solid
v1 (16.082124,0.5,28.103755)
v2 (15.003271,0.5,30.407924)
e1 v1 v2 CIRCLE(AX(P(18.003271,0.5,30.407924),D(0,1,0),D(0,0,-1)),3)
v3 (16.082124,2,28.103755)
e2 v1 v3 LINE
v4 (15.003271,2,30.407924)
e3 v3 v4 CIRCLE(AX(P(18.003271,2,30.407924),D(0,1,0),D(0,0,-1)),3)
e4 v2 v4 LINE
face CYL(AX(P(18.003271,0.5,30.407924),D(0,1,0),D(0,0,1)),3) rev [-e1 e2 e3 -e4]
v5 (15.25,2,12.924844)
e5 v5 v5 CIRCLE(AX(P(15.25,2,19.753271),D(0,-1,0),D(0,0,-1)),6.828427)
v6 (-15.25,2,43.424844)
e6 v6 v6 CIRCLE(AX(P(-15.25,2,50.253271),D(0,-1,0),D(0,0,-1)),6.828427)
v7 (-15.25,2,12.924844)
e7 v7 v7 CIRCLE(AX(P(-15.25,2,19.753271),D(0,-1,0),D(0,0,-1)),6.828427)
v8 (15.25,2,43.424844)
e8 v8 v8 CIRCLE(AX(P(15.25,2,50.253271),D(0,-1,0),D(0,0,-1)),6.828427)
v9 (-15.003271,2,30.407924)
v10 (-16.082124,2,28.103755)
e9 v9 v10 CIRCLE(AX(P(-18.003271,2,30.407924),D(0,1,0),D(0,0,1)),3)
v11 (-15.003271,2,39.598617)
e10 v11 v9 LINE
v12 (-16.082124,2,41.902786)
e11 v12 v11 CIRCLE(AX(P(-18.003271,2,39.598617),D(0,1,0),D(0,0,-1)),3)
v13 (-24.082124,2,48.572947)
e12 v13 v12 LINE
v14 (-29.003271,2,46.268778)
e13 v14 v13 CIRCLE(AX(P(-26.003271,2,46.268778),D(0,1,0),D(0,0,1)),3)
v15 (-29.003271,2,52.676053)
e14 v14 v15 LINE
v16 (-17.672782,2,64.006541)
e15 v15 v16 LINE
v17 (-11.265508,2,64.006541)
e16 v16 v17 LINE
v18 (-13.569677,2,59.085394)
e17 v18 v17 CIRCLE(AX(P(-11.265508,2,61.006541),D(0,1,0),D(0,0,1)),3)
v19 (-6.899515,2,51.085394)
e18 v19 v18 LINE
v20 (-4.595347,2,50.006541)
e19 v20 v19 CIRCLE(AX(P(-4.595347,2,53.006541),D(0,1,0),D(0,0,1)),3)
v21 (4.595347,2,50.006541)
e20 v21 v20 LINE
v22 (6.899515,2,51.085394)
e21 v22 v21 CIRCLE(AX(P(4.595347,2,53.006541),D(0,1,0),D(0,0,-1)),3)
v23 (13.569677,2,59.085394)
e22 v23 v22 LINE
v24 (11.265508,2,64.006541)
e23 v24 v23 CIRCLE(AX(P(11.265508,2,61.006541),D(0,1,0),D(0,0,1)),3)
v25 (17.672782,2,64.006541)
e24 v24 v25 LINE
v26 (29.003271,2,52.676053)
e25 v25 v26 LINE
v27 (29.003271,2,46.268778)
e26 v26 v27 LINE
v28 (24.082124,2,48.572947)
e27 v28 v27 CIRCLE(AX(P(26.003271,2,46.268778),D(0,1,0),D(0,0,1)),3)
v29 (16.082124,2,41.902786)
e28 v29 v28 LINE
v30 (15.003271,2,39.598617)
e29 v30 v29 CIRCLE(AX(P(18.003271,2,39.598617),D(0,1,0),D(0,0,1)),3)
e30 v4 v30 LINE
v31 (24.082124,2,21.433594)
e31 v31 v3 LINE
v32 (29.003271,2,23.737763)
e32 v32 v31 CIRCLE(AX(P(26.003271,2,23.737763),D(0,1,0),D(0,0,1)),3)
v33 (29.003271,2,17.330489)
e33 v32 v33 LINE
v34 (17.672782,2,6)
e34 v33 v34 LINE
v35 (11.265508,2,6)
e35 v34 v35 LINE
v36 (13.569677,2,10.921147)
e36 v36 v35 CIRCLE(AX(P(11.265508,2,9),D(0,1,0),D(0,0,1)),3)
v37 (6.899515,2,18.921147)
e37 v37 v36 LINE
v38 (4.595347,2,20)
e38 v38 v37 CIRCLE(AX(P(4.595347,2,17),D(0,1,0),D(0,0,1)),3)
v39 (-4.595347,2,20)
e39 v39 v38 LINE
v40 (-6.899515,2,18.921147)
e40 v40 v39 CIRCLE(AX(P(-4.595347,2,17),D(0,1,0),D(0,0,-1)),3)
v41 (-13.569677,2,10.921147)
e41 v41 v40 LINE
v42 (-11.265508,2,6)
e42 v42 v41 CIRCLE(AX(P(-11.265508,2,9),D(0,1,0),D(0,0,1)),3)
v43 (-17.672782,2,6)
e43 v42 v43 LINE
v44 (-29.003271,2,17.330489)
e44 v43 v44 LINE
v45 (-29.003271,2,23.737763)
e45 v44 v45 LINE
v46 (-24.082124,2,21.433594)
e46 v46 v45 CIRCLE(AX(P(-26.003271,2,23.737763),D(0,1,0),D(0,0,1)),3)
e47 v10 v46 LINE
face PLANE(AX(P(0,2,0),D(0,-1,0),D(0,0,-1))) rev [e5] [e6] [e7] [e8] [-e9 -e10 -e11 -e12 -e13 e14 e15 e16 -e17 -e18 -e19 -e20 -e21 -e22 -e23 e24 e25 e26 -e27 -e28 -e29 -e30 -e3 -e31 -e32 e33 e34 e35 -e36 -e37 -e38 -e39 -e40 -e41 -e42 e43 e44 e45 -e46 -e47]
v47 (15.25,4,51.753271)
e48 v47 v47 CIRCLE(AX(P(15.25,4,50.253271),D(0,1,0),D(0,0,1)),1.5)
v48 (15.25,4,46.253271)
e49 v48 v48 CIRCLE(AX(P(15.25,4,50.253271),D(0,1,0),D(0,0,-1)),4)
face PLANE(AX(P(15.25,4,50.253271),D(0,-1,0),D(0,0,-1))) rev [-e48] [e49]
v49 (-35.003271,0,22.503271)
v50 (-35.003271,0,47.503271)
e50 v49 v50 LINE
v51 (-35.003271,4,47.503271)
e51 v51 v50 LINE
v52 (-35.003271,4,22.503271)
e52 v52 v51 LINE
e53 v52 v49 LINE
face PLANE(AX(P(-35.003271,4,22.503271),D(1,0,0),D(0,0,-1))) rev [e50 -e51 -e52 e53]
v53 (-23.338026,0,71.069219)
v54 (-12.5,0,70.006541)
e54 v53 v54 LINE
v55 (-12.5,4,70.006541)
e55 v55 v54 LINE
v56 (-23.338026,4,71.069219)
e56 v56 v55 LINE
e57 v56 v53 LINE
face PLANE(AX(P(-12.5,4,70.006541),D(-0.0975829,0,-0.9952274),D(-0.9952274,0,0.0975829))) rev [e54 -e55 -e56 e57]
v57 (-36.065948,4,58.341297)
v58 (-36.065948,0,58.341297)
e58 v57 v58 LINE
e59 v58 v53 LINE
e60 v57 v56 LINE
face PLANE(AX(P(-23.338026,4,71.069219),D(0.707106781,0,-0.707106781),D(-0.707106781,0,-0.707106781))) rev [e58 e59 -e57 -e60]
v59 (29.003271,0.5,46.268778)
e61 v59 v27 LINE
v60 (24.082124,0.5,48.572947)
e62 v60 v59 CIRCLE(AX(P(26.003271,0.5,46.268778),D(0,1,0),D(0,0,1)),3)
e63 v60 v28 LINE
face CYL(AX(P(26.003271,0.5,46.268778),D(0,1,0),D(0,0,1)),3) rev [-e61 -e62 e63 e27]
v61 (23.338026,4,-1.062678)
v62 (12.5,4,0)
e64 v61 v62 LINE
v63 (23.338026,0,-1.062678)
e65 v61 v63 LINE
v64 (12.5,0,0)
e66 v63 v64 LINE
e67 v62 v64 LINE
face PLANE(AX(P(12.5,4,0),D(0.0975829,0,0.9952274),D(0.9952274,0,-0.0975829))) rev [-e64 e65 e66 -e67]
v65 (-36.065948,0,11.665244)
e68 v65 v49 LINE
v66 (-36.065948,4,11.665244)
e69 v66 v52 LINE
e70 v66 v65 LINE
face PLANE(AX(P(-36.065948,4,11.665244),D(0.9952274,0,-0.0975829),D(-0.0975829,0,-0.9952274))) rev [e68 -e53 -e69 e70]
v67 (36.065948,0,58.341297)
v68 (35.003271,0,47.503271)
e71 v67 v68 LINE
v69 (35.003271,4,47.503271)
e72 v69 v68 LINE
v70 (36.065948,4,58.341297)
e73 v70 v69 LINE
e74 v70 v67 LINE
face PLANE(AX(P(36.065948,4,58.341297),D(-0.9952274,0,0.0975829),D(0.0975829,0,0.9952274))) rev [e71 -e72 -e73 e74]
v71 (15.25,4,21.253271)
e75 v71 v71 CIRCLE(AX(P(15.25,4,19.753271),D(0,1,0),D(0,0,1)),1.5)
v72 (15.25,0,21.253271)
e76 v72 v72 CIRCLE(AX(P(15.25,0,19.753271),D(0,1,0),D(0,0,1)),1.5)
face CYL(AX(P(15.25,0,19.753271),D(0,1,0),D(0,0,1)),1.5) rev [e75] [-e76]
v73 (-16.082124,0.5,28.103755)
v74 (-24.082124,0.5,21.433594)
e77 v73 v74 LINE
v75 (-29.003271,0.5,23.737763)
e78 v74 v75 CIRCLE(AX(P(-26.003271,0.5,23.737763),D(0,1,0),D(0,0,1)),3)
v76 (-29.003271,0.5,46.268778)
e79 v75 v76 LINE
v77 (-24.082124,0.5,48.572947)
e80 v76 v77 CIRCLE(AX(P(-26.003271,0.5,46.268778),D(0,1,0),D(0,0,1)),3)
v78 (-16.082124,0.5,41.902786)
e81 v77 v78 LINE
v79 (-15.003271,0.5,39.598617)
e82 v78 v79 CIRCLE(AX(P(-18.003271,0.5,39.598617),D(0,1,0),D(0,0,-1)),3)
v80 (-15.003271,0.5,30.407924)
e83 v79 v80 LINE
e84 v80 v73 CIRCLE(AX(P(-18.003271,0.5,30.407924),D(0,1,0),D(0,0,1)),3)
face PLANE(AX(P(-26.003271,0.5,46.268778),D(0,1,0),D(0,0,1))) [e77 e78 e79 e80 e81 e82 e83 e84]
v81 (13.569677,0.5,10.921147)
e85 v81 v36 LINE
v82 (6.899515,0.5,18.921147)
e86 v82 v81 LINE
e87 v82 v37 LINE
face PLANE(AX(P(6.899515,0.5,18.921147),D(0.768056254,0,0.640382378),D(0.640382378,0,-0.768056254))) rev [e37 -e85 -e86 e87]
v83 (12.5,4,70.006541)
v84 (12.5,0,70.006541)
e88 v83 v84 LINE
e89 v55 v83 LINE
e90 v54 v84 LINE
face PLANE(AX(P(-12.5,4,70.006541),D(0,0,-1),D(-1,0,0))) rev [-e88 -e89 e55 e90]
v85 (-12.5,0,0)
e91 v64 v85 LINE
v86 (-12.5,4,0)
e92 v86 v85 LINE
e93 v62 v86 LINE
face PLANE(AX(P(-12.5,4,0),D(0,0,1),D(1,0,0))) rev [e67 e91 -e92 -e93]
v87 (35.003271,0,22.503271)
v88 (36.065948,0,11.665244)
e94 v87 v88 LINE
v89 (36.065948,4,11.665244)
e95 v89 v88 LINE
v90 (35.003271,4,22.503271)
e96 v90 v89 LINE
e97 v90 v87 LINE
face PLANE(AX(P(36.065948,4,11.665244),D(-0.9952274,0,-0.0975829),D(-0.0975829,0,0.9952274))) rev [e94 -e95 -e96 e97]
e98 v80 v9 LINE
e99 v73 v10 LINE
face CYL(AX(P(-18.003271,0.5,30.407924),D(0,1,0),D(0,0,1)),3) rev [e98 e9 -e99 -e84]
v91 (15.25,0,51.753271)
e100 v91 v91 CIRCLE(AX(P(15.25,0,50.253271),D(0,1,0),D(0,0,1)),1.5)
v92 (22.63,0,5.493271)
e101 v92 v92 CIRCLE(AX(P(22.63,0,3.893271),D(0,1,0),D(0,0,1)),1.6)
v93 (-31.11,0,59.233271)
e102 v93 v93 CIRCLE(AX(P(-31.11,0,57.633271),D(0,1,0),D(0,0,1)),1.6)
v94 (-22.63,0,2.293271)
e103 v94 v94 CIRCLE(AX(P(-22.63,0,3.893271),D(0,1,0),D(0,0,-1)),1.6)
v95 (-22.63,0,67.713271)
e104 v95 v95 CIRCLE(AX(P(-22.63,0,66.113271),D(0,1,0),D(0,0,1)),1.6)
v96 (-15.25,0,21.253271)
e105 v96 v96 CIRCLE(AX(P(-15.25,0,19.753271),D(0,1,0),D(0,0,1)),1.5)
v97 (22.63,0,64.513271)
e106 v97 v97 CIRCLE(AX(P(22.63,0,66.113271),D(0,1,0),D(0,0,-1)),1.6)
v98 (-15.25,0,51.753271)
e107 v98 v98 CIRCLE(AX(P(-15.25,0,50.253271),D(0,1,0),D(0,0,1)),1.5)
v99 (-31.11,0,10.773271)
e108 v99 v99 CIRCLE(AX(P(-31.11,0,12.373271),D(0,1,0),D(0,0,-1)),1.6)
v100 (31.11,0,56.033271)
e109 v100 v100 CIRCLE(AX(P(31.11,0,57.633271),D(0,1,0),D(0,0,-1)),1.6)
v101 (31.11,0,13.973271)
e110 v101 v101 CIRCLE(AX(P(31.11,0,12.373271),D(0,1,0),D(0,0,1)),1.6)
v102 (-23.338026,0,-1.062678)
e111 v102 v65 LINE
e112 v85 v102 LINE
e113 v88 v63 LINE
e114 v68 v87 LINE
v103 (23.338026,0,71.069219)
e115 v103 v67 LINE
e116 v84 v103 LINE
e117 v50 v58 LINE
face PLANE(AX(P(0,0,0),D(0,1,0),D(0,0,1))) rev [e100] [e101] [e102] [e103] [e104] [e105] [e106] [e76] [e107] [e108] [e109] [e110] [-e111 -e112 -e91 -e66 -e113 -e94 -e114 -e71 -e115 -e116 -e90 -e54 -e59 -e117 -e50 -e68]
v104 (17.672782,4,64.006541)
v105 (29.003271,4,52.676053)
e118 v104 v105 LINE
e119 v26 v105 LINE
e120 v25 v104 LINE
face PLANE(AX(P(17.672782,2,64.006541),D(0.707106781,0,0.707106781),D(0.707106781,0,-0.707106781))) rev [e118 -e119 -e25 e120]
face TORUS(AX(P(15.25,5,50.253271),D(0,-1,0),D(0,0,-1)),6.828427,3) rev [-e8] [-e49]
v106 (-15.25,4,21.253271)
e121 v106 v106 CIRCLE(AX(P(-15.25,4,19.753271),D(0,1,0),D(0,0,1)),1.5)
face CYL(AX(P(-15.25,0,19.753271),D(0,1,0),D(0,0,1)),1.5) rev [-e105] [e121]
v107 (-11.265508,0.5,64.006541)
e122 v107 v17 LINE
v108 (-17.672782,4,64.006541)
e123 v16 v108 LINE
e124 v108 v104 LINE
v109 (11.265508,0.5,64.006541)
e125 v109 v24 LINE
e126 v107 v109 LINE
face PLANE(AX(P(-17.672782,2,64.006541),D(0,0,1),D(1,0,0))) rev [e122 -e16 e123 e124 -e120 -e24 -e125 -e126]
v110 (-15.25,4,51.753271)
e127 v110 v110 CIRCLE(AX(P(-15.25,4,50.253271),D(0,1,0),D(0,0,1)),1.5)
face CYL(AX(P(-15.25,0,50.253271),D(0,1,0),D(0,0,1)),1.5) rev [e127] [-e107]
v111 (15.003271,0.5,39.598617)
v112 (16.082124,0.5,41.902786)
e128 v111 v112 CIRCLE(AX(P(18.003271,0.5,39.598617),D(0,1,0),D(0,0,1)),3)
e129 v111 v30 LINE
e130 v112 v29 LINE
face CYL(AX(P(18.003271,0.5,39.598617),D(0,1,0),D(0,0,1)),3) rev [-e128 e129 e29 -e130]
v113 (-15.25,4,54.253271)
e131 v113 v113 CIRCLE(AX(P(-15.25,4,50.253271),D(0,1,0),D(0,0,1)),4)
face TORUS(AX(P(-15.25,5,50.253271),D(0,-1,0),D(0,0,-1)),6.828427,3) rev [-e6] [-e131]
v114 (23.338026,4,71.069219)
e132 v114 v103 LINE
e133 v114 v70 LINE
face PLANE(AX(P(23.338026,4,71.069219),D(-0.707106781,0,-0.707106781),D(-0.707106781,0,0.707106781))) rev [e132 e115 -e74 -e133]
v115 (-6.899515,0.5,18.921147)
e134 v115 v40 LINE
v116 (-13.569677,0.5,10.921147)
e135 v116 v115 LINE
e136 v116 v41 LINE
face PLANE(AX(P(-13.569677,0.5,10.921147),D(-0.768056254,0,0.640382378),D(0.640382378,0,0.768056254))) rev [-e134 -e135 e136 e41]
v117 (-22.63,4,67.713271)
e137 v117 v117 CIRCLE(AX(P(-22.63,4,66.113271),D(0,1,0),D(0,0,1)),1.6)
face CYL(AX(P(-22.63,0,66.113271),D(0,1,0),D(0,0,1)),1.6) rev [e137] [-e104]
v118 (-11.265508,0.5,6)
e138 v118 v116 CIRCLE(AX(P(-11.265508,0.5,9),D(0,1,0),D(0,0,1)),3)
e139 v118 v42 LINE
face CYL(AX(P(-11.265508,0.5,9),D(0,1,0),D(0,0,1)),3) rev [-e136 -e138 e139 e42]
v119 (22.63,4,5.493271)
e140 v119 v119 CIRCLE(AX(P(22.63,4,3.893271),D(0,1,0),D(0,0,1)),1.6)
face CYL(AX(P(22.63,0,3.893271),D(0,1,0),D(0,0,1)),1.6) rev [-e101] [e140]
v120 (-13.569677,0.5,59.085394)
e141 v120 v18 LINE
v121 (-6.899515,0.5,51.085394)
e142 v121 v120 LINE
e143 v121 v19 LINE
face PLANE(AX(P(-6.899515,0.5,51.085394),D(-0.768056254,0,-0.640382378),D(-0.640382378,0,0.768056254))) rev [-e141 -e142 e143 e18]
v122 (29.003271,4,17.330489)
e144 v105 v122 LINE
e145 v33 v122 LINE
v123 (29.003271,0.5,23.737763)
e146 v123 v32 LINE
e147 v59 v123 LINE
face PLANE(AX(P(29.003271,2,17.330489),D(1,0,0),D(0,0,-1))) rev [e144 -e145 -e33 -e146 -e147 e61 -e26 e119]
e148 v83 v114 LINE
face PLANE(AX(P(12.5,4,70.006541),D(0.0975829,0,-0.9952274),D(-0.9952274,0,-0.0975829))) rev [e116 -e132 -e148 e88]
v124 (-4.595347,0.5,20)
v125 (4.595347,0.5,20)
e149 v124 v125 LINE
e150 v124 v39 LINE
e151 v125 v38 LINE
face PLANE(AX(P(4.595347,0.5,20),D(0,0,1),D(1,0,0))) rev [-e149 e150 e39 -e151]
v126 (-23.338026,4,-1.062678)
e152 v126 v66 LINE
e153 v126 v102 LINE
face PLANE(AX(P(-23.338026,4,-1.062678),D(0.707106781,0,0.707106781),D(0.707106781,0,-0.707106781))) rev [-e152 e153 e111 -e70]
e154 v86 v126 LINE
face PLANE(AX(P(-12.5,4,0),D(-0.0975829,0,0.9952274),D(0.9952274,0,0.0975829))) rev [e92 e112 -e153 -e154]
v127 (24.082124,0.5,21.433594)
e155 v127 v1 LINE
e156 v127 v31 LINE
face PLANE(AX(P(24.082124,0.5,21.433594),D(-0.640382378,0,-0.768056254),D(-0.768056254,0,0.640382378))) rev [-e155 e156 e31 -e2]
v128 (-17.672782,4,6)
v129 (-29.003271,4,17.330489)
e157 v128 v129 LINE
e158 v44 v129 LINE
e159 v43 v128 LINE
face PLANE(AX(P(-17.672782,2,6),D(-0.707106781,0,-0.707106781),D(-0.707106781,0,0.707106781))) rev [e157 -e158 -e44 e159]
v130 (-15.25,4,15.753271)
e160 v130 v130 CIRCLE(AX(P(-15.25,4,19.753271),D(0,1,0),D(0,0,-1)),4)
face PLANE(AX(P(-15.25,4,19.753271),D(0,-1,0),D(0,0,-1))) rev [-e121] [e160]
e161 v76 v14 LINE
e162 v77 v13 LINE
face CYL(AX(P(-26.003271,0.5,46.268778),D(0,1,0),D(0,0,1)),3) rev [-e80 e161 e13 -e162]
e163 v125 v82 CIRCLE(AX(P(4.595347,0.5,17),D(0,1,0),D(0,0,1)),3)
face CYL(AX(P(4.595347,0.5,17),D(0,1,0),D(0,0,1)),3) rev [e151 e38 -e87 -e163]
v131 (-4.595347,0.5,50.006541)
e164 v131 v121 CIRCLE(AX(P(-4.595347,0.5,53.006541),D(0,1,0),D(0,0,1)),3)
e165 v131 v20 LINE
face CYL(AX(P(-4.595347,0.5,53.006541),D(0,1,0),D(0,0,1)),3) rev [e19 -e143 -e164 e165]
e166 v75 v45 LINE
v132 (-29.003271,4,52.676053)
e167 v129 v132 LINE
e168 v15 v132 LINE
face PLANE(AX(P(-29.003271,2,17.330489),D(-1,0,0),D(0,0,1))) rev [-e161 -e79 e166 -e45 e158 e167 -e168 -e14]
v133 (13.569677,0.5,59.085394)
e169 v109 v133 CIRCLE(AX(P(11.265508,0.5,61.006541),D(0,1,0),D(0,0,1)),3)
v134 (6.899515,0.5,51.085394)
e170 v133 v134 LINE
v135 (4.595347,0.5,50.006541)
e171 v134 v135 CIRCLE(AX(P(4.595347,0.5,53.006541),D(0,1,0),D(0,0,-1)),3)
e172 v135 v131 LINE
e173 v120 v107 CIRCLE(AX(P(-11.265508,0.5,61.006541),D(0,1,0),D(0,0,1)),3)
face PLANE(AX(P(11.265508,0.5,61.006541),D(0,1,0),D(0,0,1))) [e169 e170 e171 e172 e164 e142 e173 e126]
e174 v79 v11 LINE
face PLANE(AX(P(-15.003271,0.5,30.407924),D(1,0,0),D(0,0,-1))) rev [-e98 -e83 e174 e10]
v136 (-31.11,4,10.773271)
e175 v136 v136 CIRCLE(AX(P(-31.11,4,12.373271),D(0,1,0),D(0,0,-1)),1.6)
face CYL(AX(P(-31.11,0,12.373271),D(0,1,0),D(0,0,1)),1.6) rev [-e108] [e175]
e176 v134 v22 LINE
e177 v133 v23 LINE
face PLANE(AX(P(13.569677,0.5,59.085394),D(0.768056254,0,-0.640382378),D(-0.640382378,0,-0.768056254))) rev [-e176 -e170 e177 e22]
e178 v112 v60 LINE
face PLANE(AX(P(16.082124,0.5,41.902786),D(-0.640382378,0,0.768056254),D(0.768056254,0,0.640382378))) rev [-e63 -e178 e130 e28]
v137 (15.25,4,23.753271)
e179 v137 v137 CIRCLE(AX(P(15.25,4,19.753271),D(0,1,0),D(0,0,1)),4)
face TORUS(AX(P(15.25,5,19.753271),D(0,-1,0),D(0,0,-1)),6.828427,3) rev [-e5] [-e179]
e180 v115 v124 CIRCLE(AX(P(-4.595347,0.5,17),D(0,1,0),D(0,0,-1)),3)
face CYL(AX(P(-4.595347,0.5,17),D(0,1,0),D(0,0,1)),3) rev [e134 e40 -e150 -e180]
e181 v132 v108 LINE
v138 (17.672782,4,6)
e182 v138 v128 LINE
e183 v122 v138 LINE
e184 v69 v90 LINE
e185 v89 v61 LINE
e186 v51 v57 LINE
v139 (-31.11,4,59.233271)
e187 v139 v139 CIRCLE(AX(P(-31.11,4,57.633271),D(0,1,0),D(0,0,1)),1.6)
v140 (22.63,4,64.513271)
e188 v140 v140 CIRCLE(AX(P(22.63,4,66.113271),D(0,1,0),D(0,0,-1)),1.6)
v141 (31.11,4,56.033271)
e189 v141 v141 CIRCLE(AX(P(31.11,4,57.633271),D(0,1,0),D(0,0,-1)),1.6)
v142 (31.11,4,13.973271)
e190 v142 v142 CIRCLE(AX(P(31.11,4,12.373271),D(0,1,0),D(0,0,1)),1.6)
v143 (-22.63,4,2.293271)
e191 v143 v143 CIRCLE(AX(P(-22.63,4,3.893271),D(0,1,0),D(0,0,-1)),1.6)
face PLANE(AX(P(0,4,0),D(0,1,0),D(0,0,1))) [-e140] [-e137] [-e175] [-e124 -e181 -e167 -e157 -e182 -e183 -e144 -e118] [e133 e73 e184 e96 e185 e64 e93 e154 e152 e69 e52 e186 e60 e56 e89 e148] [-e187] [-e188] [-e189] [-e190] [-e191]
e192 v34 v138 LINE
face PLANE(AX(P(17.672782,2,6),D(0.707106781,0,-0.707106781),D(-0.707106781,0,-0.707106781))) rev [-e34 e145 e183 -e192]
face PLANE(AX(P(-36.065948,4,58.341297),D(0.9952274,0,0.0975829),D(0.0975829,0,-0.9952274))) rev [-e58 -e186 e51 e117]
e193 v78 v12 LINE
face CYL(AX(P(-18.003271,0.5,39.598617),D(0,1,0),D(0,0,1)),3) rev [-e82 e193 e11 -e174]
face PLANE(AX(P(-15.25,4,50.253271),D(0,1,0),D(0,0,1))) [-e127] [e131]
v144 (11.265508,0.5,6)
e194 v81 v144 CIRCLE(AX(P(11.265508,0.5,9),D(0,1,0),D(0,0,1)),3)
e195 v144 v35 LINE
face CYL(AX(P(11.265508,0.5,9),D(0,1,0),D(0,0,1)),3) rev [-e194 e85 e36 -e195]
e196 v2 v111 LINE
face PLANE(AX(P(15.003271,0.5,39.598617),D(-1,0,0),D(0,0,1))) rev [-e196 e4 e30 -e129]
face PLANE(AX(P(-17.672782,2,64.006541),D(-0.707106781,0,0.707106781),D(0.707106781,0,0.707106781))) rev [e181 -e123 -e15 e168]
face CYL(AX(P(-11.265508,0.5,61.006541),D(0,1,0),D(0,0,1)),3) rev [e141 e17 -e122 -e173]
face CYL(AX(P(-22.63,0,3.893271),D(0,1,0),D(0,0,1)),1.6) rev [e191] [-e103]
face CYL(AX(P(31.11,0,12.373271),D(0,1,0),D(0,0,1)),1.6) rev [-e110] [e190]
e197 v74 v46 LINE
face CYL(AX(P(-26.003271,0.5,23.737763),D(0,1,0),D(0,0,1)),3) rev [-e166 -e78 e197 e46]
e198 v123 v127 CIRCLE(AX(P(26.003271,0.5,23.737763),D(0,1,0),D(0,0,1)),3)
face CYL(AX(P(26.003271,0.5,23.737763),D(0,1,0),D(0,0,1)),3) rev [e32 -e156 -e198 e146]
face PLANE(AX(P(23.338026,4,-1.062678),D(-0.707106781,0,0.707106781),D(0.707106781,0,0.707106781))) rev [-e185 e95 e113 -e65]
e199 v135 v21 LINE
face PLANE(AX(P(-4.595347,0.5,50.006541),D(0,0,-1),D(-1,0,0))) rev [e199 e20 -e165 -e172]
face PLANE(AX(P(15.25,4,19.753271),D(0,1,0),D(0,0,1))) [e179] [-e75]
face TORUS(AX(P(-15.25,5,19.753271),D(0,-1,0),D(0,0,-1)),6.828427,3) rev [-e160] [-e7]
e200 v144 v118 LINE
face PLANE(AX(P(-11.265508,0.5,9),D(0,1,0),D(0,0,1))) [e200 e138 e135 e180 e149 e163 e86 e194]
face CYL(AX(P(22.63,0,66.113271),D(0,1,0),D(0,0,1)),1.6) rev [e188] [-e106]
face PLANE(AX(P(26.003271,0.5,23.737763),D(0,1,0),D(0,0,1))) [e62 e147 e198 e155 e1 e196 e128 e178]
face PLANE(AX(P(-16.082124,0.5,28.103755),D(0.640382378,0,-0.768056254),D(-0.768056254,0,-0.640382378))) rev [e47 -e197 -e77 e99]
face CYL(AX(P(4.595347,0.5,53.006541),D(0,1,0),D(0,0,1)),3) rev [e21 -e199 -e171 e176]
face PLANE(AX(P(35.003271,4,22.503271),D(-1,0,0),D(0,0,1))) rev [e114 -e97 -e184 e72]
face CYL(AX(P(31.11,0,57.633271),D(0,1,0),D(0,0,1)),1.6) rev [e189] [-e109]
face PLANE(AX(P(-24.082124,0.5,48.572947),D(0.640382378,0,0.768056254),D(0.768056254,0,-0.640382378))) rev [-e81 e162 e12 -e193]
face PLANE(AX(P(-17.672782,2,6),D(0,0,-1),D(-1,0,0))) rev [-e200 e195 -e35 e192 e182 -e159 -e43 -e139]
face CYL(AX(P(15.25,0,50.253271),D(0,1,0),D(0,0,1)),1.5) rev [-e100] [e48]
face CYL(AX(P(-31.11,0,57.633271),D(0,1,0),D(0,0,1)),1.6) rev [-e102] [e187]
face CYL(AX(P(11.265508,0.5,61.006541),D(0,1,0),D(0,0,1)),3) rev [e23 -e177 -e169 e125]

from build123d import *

# Parameters (mm, degrees)
BOSS_EXTRUDE1_DEPTH = 4
SKETCH2_R           = 1.6
CUT_EXTRUDE1_DEPTH  = 80.797158741
CUT_EXTRUDE2_DEPTH  = 2
CUT_EXTRUDE3_DEPTH  = 1.5
SKETCH5_R           = 4
BOSS_EXTRUDE3_DEPTH = 2
SKETCH6_R           = 1.5
CUT_EXTRUDE4_DEPTH  = 80.797158741
FILLET1_R           = 3


with BuildPart() as part:
    # Sketch1 → Boss-Extrude1 (new body)
    with BuildSketch(Plane(origin=(0, 0, 0), x_dir=(1, 0, 0), z_dir=(0, 1, 0))):
        Polygon((-12.5, 0), (12.5, 0), (23.338026386, 1.062677778), (36.065948447, -11.665244283), (35.003270669, -22.503270669), (35.003270669, -47.503270669), (36.065948447, -58.341297055), (23.338026386, -71.069219116), (12.5, -70.006541338), (-12.5, -70.006541338), (-23.338026386, -71.069219116), (-36.065948447, -58.341297055), (-35.003270669, -47.503270669), (-35.003270669, -22.503270669), (-36.065948447, -11.665244283), (-23.338026386, 1.062677778), align=None)
    extrude(amount=BOSS_EXTRUDE1_DEPTH)

    # Sketch2 → Cut-Extrude1 (cut, through all)
    with BuildSketch(Plane(origin=(0, 4, 0), x_dir=(1, 0, 0), z_dir=(0, 1, 0))):
        with Locations(Location((22.63, -3.893270669, 0), (0, 0, 270))):
            Circle(SKETCH2_R)
        with Locations(Location((31.11, -12.373270669, 0), (0, 0, 270))):
            Circle(SKETCH2_R)
        with Locations(Location((-31.11, -12.373270669, 0), (0, 0, 90))):
            Circle(SKETCH2_R)
        with Locations(Location((-22.63, -3.893270669, 0), (0, 0, 90))):
            Circle(SKETCH2_R)
        with Locations(Location((31.11, -57.633270669, 0), (0, 0, 90))):
            Circle(SKETCH2_R)
        with Locations(Location((22.63, -66.113270669, 0), (0, 0, 90))):
            Circle(SKETCH2_R)
        with Locations(Location((-22.63, -66.113270669, 0), (0, 0, 270))):
            Circle(SKETCH2_R)
        with Locations(Location((-31.11, -57.633270669, 0), (0, 0, 270))):
            Circle(SKETCH2_R)
    extrude(amount=-CUT_EXTRUDE1_DEPTH, mode=Mode.SUBTRACT)

    # Sketch3 → Cut-Extrude2 (cut)
    with BuildSketch(Plane(origin=(0, 4, 0), x_dir=(1, 0, 0), z_dir=(0, 1, 0))):
        Polygon((-17.672782103, -6), (17.672782103, -6), (29.003270669, -17.330488566), (29.003270669, -52.676052772), (17.672782103, -64.006541338), (-17.672782103, -64.006541338), (-29.003270669, -52.676052772), (-29.003270669, -17.330488566), align=None)
    extrude(amount=-CUT_EXTRUDE2_DEPTH, mode=Mode.SUBTRACT)

    # Sketch4 → Cut-Extrude3 (cut)
    with BuildSketch(Plane(origin=(0, 2, 0), x_dir=(1, 0, 0), z_dir=(0, 1, 0))):
        with BuildLine():
            Line((-4.595346553, -50.006541338), (4.595346553, -50.006541338))
            ThreePointArc((4.595346553, -50.006541338), (5.867462624, -50.289609115), (6.899515315, -51.085394202))
            Line((6.899515315, -51.085394202), (13.569676517, -59.085394202))
            ThreePointArc((13.569676517, -59.085394202), (13.982439977, -62.278657408), (11.265507754, -64.006541338))
            Line((11.265507754, -64.006541338), (-11.265507754, -64.006541338))
            ThreePointArc((-11.265507754, -64.006541338), (-13.982439977, -62.278657408), (-13.569676517, -59.085394202))
            Line((-13.569676517, -59.085394202), (-6.899515315, -51.085394202))
            ThreePointArc((-6.899515315, -51.085394202), (-5.867462624, -50.289609115), (-4.595346553, -50.006541338))
        make_face()
        with BuildLine():
            Line((-24.082123534, -48.572947186), (-16.082123534, -41.902785984))
            ThreePointArc((-16.082123534, -41.902785984), (-15.286338446, -40.870733292), (-15.003270669, -39.598617222))
            Line((-15.003270669, -39.598617222), (-15.003270669, -30.407924116))
            ThreePointArc((-15.003270669, -30.407924116), (-15.286338446, -29.135808045), (-16.082123534, -28.103755354))
            Line((-16.082123534, -28.103755354), (-24.082123534, -21.433594152))
            ThreePointArc((-24.082123534, -21.433594152), (-27.27538674, -21.020830692), (-29.003270669, -23.737762914))
            Line((-29.003270669, -23.737762914), (-29.003270669, -46.268778423))
            ThreePointArc((-29.003270669, -46.268778423), (-27.27538674, -48.985710646), (-24.082123534, -48.572947186))
        make_face()
        with BuildLine():
            Line((-13.569676517, -10.921147135), (-6.899515315, -18.921147135))
            ThreePointArc((-6.899515315, -18.921147135), (-5.867462624, -19.716932223), (-4.595346553, -20))
            Line((-4.595346553, -20), (4.595346553, -20))
            ThreePointArc((4.595346553, -20), (5.867462624, -19.716932223), (6.899515315, -18.921147135))
            Line((6.899515315, -18.921147135), (13.569676517, -10.921147135))
            ThreePointArc((13.569676517, -10.921147135), (13.982439977, -7.727883929), (11.265507754, -6))
            Line((11.265507754, -6), (-11.265507754, -6))
            ThreePointArc((-11.265507754, -6), (-13.982439977, -7.727883929), (-13.569676517, -10.921147135))
        make_face()
        with BuildLine():
            Line((24.082123534, -21.433594152), (16.082123534, -28.103755354))
            ThreePointArc((16.082123534, -28.103755354), (15.286338446, -29.135808045), (15.003270669, -30.407924116))
            Line((15.003270669, -30.407924116), (15.003270669, -39.598617222))
            ThreePointArc((15.003270669, -39.598617222), (15.286338446, -40.870733292), (16.082123534, -41.902785984))
            Line((16.082123534, -41.902785984), (24.082123534, -48.572947186))
            ThreePointArc((24.082123534, -48.572947186), (27.27538674, -48.985710646), (29.003270669, -46.268778423))
            Line((29.003270669, -46.268778423), (29.003270669, -23.737762914))
            ThreePointArc((29.003270669, -23.737762914), (27.27538674, -21.020830692), (24.082123534, -21.433594152))
        make_face()
    extrude(amount=-CUT_EXTRUDE3_DEPTH, mode=Mode.SUBTRACT)

    # Sketch5 → Boss-Extrude3 (add)
    with BuildSketch(Plane(origin=(0, 2, 0), x_dir=(1, 0, 0), z_dir=(0, 1, 0))):
        with Locations(Location((15.25, -19.753270669, 0), (0, 0, 90))):
            Circle(SKETCH5_R)
        with Locations(Location((-15.25, -19.753270669, 0), (0, 0, 90))):
            Circle(SKETCH5_R)
        with Locations(Location((-15.25, -50.253270669, 0), (0, 0, 90))):
            Circle(SKETCH5_R)
        with Locations(Location((15.25, -50.253270669, 0), (0, 0, 90))):
            Circle(SKETCH5_R)
    extrude(amount=BOSS_EXTRUDE3_DEPTH)

    # Sketch6 → Cut-Extrude4 (cut, through all)
    with BuildSketch(Plane(origin=(0, 4, 0), x_dir=(1, 0, 0), z_dir=(0, 1, 0))):
        with Locations(Location((15.25, -19.753270669, 0), (0, 0, 270))):
            Circle(SKETCH6_R)
        with Locations(Location((15.25, -50.253270669, 0), (0, 0, 270))):
            Circle(SKETCH6_R)
        with Locations(Location((-15.25, -50.253270669, 0), (0, 0, 270))):
            Circle(SKETCH6_R)
        with Locations(Location((-15.25, -19.753270669, 0), (0, 0, 270))):
            Circle(SKETCH6_R)
    extrude(amount=-CUT_EXTRUDE4_DEPTH, mode=Mode.SUBTRACT)

    # Fillet1
    # the kernel refuses this fillet: 3 mm, written as the material it adds along each edge
    with BuildSketch(Plane(origin=(15.25, 2, 19.753270669), x_dir=(0, 0, -1), z_dir=(1, 0, 0))) as fillet1_piece_1:
        with BuildLine():
            CenterArc((6.828427125, 3), FILLET1_R, 199.471220634, 70.528779366)
            Line((4, 2), (3.943431458, 1.98))
            ThreePointArc((3.943431458, 1.98), (3.94, 1), (3.94, 0))
            Line((3.94, 0), (4, -0.06))
            Line((4, -0.06), (6.828427125, -0.06))
            Line((6.828427125, -0.06), (6.828427125, 0))
        make_face()
    revolve(axis=Axis((15.25, 2, 19.753270669), (0, 1, 0)))
    with BuildSketch(Plane(origin=(-15.25, 2, 19.753270669), x_dir=(0, 0, -1), z_dir=(1, 0, 0))) as fillet1_piece_2:
        with BuildLine():
            CenterArc((6.828427125, 3), FILLET1_R, 199.471220634, 70.528779366)
            Line((4, 2), (3.943431458, 1.98))
            ThreePointArc((3.943431458, 1.98), (3.94, 1), (3.94, 0))
            Line((3.94, 0), (4, -0.06))
            Line((4, -0.06), (6.828427125, -0.06))
            Line((6.828427125, -0.06), (6.828427125, 0))
        make_face()
    revolve(axis=Axis((-15.25, 2, 19.753270669), (0, 1, 0)))
    with BuildSketch(Plane(origin=(-15.25, 2, 50.253270669), x_dir=(0, 0, -1), z_dir=(1, 0, 0))) as fillet1_piece_3:
        with BuildLine():
            CenterArc((6.828427125, 3), FILLET1_R, 199.471220634, 70.528779366)
            Line((4, 2), (3.943431458, 1.98))
            ThreePointArc((3.943431458, 1.98), (3.94, 1), (3.94, 0))
            Line((3.94, 0), (4, -0.06))
            Line((4, -0.06), (6.828427125, -0.06))
            Line((6.828427125, -0.06), (6.828427125, 0))
        make_face()
    revolve(axis=Axis((-15.25, 2, 50.253270669), (0, 1, 0)))
    with BuildSketch(Plane(origin=(15.25, 2, 50.253270669), x_dir=(0, 0, -1), z_dir=(1, 0, 0))) as fillet1_piece_4:
        with BuildLine():
            CenterArc((6.828427125, 3), FILLET1_R, 199.471220634, 70.528779366)
            Line((4, 2), (3.943431458, 1.98))
            ThreePointArc((3.943431458, 1.98), (3.94, 1), (3.94, 0))
            Line((3.94, 0), (4, -0.06))
            Line((4, -0.06), (6.828427125, -0.06))
            Line((6.828427125, -0.06), (6.828427125, 0))
        make_face()
    revolve(axis=Axis((15.25, 2, 50.253270669), (0, 1, 0)))


solid = part.part
